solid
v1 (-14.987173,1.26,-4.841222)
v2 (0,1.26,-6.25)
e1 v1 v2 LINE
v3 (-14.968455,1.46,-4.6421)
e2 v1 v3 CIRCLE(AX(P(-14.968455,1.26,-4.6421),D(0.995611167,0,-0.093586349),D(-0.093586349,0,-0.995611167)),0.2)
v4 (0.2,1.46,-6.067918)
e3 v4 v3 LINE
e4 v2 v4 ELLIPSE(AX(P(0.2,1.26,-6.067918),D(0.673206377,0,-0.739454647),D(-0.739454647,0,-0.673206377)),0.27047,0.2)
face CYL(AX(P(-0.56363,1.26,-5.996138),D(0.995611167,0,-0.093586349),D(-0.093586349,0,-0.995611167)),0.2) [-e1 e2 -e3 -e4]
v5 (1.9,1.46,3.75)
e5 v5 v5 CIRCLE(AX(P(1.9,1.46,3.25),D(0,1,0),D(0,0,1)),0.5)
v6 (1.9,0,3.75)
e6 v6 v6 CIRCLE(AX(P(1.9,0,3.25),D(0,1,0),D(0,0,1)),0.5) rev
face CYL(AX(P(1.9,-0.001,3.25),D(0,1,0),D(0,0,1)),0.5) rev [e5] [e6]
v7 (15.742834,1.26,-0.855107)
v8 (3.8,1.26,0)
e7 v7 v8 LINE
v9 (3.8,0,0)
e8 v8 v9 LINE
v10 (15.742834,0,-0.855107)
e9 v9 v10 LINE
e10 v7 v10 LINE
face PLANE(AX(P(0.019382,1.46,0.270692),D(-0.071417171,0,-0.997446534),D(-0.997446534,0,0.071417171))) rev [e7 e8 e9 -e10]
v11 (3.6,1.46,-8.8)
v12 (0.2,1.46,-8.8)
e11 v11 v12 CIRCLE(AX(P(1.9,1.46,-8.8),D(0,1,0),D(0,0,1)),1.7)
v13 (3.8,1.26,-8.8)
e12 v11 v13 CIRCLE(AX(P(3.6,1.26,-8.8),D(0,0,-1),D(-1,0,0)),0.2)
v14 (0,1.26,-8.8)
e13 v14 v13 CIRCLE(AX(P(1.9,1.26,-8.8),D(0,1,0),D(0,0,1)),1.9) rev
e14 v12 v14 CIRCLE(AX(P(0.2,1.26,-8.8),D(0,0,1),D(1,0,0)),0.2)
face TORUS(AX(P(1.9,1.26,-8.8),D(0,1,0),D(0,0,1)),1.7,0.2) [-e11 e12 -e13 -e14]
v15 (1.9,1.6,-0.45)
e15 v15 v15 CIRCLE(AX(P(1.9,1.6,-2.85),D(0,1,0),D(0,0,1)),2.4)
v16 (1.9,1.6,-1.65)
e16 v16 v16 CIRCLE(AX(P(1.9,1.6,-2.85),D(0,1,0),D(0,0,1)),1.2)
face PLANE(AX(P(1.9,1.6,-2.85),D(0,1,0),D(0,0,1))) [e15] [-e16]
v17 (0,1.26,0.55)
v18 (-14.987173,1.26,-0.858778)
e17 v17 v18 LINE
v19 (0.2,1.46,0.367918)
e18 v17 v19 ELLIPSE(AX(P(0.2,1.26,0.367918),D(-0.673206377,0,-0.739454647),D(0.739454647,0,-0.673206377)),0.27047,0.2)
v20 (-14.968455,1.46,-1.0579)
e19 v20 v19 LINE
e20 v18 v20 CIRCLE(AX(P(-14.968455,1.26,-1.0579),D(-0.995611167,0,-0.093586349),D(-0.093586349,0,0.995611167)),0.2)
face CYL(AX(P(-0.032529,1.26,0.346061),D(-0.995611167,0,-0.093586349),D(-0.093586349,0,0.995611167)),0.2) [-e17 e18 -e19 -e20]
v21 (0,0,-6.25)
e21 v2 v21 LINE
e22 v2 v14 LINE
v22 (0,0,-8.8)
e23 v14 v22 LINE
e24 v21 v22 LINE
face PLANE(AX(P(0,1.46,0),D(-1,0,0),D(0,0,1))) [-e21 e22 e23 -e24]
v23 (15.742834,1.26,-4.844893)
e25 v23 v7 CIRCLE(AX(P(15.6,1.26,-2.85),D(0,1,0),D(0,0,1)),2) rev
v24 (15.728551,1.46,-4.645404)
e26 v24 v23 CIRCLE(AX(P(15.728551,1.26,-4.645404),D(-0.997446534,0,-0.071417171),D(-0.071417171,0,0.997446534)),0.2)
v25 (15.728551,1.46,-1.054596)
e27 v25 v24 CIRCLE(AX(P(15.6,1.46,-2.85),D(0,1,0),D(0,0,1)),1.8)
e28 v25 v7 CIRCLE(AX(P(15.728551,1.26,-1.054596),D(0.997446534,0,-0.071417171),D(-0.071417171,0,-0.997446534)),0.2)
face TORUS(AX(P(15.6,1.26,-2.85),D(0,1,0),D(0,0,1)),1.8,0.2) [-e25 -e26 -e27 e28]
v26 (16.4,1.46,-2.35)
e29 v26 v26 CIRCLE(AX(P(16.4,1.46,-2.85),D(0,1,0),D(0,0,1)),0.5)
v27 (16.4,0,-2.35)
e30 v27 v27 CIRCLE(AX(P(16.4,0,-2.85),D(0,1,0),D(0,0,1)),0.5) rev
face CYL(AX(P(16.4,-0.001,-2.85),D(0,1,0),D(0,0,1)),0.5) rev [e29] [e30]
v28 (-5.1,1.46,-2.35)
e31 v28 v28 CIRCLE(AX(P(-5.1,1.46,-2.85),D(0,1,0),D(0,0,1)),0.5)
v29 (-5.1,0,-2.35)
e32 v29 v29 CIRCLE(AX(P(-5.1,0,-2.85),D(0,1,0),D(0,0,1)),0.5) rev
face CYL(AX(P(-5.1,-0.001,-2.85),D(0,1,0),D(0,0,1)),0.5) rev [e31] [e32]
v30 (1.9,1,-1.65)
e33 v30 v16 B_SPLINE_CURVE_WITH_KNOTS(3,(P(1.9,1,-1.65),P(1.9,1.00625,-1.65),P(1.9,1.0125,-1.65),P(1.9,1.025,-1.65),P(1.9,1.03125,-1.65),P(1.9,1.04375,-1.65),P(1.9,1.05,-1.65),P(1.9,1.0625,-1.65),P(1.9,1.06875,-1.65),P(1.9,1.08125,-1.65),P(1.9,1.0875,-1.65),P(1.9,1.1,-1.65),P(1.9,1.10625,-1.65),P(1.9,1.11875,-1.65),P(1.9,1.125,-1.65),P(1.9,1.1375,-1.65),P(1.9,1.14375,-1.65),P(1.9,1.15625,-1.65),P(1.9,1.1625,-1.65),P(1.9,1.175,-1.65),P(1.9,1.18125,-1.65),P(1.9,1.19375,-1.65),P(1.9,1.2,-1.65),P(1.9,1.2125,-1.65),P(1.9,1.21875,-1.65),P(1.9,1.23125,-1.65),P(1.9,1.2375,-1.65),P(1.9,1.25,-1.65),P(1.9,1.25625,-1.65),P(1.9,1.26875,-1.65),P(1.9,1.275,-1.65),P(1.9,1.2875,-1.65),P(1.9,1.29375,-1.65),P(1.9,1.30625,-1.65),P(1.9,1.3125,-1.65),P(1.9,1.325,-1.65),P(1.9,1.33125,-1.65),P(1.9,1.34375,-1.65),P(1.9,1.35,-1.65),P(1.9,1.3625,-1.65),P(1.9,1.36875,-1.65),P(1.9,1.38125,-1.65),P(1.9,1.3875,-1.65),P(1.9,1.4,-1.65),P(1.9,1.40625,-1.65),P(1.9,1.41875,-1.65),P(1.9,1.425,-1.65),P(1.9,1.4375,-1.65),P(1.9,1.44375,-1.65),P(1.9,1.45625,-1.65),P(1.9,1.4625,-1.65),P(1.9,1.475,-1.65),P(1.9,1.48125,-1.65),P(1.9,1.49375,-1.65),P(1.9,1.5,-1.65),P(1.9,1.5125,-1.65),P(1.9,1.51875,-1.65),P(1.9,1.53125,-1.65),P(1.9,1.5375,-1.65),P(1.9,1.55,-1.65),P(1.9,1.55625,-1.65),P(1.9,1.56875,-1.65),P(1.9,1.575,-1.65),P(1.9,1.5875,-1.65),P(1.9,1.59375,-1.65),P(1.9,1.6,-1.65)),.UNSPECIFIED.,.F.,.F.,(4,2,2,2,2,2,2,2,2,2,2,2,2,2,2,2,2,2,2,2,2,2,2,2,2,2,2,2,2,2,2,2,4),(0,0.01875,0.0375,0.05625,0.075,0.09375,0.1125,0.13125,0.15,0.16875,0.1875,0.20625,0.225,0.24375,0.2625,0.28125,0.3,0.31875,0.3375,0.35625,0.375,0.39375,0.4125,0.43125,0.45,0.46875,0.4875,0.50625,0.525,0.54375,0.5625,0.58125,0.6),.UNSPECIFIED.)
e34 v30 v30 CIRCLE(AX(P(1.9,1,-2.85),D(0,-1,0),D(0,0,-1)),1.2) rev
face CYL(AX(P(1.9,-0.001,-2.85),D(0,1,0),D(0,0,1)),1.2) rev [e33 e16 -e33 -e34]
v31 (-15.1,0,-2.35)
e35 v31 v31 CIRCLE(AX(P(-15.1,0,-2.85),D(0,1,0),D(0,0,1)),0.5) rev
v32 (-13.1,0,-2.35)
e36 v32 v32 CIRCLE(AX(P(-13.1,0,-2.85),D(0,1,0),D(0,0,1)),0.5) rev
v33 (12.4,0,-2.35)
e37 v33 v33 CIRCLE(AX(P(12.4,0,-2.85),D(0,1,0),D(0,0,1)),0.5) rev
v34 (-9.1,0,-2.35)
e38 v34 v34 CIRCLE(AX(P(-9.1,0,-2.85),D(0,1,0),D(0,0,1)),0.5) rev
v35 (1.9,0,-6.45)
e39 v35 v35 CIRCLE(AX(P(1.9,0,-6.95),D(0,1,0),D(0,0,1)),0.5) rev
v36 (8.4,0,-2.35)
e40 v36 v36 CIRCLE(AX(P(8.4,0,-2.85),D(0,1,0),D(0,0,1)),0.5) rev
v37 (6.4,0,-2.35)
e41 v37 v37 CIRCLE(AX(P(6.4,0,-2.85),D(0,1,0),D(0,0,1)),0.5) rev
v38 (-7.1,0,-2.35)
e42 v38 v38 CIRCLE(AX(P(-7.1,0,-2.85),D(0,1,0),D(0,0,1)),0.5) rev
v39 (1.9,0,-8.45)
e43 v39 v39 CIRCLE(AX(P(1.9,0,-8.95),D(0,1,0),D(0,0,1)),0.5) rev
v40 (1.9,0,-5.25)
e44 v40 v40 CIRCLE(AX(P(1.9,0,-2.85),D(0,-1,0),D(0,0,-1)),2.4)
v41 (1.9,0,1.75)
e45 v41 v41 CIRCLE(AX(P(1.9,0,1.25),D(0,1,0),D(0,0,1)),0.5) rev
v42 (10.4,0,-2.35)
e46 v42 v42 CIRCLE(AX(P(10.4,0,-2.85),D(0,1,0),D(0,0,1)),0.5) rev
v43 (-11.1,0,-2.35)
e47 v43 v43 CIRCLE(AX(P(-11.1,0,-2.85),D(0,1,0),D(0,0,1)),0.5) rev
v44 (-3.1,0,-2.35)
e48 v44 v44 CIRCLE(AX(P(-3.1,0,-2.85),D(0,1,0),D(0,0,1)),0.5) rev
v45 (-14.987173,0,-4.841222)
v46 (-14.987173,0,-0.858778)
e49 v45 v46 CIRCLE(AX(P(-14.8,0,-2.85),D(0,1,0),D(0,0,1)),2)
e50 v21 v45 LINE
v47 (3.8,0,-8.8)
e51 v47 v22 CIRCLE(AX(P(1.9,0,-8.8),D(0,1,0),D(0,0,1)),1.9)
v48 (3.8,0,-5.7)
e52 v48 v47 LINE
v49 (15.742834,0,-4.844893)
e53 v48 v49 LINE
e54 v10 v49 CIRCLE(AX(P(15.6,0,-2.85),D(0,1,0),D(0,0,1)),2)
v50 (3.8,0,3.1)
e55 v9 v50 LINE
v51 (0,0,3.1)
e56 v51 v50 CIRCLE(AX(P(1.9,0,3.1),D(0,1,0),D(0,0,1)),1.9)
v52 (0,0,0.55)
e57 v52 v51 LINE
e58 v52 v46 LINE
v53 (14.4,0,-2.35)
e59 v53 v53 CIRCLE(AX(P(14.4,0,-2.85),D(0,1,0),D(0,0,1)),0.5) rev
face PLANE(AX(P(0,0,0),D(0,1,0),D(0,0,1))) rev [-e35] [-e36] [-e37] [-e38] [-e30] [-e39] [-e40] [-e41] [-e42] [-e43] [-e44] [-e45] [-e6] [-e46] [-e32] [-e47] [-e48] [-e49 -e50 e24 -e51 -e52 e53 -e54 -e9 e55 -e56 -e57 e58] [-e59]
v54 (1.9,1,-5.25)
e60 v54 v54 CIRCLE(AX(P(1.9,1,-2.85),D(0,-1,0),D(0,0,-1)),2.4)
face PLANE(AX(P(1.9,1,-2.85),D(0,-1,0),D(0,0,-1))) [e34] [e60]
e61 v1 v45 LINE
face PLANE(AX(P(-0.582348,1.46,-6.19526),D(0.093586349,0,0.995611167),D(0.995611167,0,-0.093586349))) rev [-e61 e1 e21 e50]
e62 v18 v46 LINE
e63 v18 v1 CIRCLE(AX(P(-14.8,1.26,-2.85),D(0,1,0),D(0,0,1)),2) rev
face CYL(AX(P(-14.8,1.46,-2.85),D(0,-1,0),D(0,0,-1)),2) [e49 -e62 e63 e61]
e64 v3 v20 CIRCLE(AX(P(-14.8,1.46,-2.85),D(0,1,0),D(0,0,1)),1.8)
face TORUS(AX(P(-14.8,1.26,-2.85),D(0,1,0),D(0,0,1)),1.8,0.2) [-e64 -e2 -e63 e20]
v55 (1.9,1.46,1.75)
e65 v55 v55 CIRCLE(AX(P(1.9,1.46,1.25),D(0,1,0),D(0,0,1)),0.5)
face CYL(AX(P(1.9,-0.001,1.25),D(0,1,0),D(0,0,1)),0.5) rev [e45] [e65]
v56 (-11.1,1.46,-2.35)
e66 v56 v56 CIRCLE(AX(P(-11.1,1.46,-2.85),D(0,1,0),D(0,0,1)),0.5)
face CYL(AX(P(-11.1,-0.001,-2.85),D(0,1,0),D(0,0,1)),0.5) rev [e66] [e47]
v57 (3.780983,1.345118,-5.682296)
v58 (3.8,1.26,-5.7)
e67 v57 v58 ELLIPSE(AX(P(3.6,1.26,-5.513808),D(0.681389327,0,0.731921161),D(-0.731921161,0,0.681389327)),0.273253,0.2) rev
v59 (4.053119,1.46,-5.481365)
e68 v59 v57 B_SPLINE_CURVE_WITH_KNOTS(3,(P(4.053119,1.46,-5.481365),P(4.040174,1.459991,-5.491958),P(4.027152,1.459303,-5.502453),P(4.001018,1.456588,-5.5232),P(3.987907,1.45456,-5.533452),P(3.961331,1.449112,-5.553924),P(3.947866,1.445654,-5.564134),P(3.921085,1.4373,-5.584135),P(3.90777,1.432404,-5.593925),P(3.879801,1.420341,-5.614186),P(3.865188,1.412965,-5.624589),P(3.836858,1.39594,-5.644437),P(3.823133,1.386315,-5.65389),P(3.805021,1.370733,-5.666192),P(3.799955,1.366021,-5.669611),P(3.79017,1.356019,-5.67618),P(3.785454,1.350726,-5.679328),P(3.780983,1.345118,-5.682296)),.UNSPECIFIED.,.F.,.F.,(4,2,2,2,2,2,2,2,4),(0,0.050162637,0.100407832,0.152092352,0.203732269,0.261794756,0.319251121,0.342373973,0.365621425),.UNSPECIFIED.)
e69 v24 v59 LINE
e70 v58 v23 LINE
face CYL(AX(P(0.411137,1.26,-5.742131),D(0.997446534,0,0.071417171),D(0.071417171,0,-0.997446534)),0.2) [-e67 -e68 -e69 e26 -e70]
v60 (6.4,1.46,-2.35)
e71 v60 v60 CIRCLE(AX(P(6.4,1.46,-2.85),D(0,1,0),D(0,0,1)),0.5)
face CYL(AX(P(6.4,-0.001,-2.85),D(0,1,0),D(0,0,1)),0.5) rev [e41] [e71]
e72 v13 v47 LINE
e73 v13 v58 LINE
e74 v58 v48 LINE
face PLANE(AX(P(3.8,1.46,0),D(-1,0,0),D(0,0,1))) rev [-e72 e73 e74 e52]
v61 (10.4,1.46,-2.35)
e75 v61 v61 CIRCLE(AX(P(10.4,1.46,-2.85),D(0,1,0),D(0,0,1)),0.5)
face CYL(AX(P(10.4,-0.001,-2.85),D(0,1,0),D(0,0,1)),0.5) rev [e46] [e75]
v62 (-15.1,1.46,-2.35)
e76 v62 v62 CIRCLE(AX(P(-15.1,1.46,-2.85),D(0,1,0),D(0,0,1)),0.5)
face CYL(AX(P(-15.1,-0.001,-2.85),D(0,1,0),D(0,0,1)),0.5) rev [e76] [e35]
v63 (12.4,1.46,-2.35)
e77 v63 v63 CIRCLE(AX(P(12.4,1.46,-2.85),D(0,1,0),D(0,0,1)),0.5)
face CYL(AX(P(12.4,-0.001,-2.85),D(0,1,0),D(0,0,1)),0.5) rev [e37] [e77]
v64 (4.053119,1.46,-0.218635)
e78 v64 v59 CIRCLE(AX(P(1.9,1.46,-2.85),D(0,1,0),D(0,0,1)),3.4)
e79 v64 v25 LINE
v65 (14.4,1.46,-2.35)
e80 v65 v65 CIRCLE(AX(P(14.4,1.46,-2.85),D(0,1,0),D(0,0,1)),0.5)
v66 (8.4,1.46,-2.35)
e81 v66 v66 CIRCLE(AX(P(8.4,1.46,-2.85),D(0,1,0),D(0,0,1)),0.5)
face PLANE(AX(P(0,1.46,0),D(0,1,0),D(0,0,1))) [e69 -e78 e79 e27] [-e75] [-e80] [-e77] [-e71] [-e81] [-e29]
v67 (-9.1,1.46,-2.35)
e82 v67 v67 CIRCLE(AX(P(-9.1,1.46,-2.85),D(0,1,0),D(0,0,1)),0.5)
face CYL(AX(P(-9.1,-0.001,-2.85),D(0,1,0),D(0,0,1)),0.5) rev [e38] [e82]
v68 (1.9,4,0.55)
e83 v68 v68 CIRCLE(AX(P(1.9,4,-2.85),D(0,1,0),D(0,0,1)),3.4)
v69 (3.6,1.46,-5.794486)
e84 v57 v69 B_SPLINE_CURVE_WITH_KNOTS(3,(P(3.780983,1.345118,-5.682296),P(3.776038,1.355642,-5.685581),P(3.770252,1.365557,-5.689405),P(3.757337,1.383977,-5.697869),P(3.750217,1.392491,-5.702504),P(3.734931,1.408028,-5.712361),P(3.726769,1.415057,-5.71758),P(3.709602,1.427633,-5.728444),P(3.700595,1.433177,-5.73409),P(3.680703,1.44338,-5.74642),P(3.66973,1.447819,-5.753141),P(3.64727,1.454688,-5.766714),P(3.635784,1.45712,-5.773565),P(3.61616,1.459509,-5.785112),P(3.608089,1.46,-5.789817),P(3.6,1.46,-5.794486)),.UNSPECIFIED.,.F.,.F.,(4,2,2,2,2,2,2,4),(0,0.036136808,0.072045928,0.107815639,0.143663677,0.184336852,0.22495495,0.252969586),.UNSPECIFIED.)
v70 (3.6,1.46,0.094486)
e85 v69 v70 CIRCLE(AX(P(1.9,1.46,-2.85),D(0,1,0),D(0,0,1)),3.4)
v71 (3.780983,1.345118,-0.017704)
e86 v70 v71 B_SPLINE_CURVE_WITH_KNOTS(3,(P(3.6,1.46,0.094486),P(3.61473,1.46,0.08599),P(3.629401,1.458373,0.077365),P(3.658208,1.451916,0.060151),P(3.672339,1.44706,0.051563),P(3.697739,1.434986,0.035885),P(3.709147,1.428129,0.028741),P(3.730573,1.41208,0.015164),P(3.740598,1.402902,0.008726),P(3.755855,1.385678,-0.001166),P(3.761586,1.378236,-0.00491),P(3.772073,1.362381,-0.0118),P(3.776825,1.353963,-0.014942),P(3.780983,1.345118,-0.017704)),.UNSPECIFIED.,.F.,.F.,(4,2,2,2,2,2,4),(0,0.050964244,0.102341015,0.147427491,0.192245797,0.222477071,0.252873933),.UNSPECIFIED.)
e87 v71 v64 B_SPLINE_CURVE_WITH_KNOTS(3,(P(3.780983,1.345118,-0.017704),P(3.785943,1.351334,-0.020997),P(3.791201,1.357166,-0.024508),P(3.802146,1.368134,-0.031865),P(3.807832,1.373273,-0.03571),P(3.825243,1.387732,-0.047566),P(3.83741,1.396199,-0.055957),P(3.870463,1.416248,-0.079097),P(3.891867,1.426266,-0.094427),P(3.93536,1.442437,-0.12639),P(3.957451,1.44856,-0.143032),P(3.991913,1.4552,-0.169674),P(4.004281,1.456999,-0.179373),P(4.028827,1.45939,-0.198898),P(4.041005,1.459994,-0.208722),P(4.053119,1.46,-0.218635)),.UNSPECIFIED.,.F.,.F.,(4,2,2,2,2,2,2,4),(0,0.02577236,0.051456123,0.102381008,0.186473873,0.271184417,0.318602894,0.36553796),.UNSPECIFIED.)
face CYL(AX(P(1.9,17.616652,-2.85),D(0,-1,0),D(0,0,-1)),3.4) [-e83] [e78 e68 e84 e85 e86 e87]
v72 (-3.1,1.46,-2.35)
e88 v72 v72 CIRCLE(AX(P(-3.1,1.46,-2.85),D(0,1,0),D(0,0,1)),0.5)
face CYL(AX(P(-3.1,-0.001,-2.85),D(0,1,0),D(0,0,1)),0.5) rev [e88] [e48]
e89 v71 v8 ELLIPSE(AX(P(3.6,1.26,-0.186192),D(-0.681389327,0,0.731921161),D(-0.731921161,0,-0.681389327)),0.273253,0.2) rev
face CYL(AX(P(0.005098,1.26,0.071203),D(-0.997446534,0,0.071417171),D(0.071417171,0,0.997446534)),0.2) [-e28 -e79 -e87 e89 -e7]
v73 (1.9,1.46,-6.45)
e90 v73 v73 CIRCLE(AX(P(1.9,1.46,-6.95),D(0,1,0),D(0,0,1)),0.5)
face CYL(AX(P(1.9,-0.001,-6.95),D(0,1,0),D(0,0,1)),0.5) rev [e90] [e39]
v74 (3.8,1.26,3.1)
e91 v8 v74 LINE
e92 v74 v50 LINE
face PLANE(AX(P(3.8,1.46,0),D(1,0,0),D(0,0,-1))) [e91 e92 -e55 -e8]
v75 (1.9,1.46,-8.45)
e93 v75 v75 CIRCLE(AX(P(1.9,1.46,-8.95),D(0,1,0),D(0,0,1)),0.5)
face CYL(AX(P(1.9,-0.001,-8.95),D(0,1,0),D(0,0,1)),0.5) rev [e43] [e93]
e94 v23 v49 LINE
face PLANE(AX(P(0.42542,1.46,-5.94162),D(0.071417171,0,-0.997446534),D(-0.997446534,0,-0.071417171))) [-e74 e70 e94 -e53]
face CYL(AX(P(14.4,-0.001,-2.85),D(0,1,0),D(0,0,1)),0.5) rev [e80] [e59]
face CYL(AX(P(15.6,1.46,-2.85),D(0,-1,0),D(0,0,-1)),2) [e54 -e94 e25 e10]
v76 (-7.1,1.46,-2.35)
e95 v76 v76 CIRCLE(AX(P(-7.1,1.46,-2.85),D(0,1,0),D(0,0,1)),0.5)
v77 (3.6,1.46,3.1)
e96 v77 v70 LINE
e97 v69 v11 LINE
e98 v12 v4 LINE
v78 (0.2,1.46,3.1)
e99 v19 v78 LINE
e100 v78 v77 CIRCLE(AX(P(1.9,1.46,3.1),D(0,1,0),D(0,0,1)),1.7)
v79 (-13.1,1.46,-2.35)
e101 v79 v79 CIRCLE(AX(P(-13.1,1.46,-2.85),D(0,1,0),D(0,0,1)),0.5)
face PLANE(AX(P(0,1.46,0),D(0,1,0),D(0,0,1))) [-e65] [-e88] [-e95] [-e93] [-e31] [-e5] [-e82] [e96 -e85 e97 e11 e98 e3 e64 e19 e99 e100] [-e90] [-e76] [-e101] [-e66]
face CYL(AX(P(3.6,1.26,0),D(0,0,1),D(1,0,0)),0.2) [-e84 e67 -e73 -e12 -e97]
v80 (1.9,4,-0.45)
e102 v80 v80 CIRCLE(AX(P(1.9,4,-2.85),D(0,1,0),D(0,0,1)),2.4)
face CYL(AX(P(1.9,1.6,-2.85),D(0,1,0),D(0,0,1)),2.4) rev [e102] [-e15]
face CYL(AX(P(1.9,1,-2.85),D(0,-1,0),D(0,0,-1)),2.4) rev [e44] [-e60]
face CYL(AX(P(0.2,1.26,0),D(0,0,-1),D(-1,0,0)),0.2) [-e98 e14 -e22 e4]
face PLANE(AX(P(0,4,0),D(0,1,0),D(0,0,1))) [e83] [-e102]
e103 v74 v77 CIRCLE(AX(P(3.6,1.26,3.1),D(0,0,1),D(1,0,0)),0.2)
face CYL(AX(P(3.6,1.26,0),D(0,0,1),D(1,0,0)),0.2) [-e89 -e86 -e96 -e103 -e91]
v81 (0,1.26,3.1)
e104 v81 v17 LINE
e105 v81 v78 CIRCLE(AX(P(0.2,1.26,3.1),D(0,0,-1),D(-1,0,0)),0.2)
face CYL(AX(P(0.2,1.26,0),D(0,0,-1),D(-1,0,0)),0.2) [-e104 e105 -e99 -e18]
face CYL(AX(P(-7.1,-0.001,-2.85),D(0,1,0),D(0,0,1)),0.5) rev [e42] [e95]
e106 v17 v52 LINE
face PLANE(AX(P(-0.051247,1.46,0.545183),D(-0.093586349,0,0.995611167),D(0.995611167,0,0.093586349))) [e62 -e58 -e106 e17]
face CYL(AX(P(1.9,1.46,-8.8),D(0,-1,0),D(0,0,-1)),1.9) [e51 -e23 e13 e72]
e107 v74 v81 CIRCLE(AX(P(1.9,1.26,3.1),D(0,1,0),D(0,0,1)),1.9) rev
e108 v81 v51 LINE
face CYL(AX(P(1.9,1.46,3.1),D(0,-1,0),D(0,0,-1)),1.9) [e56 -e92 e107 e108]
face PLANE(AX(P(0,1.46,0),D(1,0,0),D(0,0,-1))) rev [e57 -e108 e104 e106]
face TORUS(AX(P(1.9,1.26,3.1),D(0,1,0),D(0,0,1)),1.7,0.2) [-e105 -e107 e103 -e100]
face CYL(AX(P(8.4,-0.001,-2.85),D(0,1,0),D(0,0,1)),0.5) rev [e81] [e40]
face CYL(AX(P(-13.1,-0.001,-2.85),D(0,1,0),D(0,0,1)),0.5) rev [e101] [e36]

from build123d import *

# Parameters (mm, degrees)
BOSS_EXTRUDE2_START       = -1.46
BOSS_EXTRUDE2_DEPTH       = 1.46
BOSS_EXTRUDE2_2_OUTLINE_R = 3.4
BOSS_EXTRUDE2_2_DEPTH     = 2.54
FILLET1_R                 = 0.2
SKETCH3_R                 = 2.4
CUT_EXTRUDE1_DEPTH        = 2.4
CUT_EXTRUDE2_START        = -1
SKETCH4_R                 = 2.4
CUT_EXTRUDE2_DEPTH        = 1
CUT_EXTRUDE3_REACH        = 22.737
SKETCH5_R                 = 1.2
CUT_EXTRUDE4_REACH        = 22.753
SKETCH6_R                 = 0.5


# Read off the part's stored shape, not the designer's step: Boss-Extrude2
with BuildPart() as part:
    # Boss-Extrude2 outline → Boss-Extrude2 (new body)
    with BuildSketch(Plane(origin=(0, 1.46, 0), x_dir=(1, 0, 0), z_dir=(0, 1, 0)).offset(BOSS_EXTRUDE2_START)):
        with BuildLine():
            ThreePointArc((0, -3.1), (1.9, -5), (3.8, -3.1))
            Line((3.8, -3.1), (3.8, 0))
            Line((3.8, 0), (15.742834343, 0.855106933))
            ThreePointArc((15.742834343, 0.855106933), (17.6, 2.85), (15.742834343, 4.844893067))
            Line((15.742834343, 4.844893067), (3.8, 5.7))
            Line((3.8, 5.7), (3.8, 8.8))
            ThreePointArc((3.8, 8.8), (1.9, 10.7), (0, 8.8))
            Line((0, 8.8), (0, 6.25))
            Line((0, 6.25), (-14.987172698, 4.841222333))
            ThreePointArc((-14.987172698, 4.841222333), (-16.8, 2.85), (-14.987172698, 0.858777667))
            Line((-14.987172698, 0.858777667), (0, -0.55))
            Line((0, -0.55), (0, -3.1))
        make_face()
    extrude(amount=BOSS_EXTRUDE2_DEPTH)

    # Boss-Extrude2 2 outline → Boss-Extrude2 2 (add)
    with BuildSketch(Plane(origin=(0, 1.46, 0), x_dir=(1, 0, 0), z_dir=(0, 1, 0))):
        with Locations((1.9, 2.85)):
            Circle(BOSS_EXTRUDE2_2_OUTLINE_R)
    extrude(amount=BOSS_EXTRUDE2_2_DEPTH)

    # Fillet1
    # the kernel refuses this fillet: 0.2 mm, written as the material it takes off along each edge
    with BuildSketch(Plane(origin=(15.6, 1.46, -2.85), x_dir=(0.0714171712881136, 0, 0.9974465337276001), z_dir=(-0.9974465337276001, 0, 0.0714171712881136))) as fillet1_piece_1:
        with BuildLine():
            CenterArc((2 - FILLET1_R, -FILLET1_R), FILLET1_R, 0, 90)
            Line((2, -FILLET1_R), (2, 0))
            Line((2, 0), (2 - FILLET1_R, 0))
        make_face()
    revolve(axis=Axis((15.6, 1.46, -2.85), (0, 1, 0)), revolution_arc=171.809222188, mode=Mode.SUBTRACT)
    with BuildSketch(Plane(origin=(15.742834343, 1.46, -4.844893067), x_dir=(-0.07141717131707818, 0, 0.9974465337255262), z_dir=(-0.9974465337255262, 0, -0.07141717131707818))) as fillet1_piece_2_section:
        with BuildLine():
            CenterArc((FILLET1_R, -FILLET1_R), FILLET1_R, 90, 90)
            Line((0, -FILLET1_R), (0, 0))
            Line((0, 0), (FILLET1_R, 0))
        make_face()
    fillet1_piece_2 = extrude(amount=12.473408037, mode=Mode.PRIVATE)
    fillet1_piece_2 = fillet1_piece_2 - Plane(origin=(1.9, 1.414610024, -2.85), x_dir=(1, 0, 0), z_dir=(0, -1, 0)) * Cylinder(3.4, 26, mode=Mode.PRIVATE)
    fillet1_piece_2 = split(fillet1_piece_2, bisect_by=Plane(origin=(3.8, 1.414610024, -5.226018326), z_dir=(1, 0, 0)), keep=Keep.TOP, mode=Mode.PRIVATE)
    add(fillet1_piece_2, mode=Mode.SUBTRACT)
    with BuildSketch(Plane(origin=(3.8, 1.46, -5.2), x_dir=(-1, 0, 0), z_dir=(0, 0, -1))) as fillet1_piece_3_section:
        with BuildLine():
            CenterArc((FILLET1_R, -FILLET1_R), FILLET1_R, 90, 90)
            Line((0, -FILLET1_R), (0, 0))
            Line((0, 0), (FILLET1_R, 0))
        make_face()
    fillet1_piece_3 = extrude(amount=3.6, mode=Mode.PRIVATE)
    fillet1_piece_3 = fillet1_piece_3 - Plane(origin=(1.9, 1.414595977, -2.85), x_dir=(1, 0, 0), z_dir=(0, -1, 0)) * Cylinder(3.4, 9, mode=Mode.PRIVATE)
    fillet1_piece_3 = split(fillet1_piece_3, bisect_by=Plane(origin=(3.644376432, 1.414595977, -5.711142647), z_dir=(0.07141717131707818, 0, -0.9974465337255262)), keep=Keep.TOP, mode=Mode.PRIVATE)
    add(fillet1_piece_3, mode=Mode.SUBTRACT)
    with BuildSketch(Plane(origin=(1.9, 1.46, -8.8), x_dir=(1, 0, 0), z_dir=(0, 0, 1))) as fillet1_piece_4:
        with BuildLine():
            CenterArc((1.9 - FILLET1_R, -FILLET1_R), FILLET1_R, 0, 90)
            Line((1.9 - FILLET1_R, 0), (1.9, 0))
            Line((1.9, 0), (1.9, -FILLET1_R))
        make_face()
    revolve(axis=Axis((1.9, 1.46, -8.8), (0, 1, 0)), revolution_arc=180, mode=Mode.SUBTRACT)
    with BuildSketch(Plane(origin=(0, 1.46, -8.8), x_dir=(0, -1, 0), z_dir=(0, 0, 1))) as fillet1_piece_5_section:
        with BuildLine():
            CenterArc((FILLET1_R, FILLET1_R), FILLET1_R, 180, 90)
            Line((0, FILLET1_R), (0, 0))
            Line((0, 0), (FILLET1_R, 0))
        make_face()
    fillet1_piece_5 = extrude(amount=3.05, mode=Mode.PRIVATE)
    fillet1_piece_5 = split(fillet1_piece_5, bisect_by=Plane(origin=(0.163811302, 1.414680425, -6.265398081), z_dir=(-0.09358634913497901, 0, -0.9956111666989207)), keep=Keep.TOP, mode=Mode.PRIVATE)
    add(fillet1_piece_5, mode=Mode.SUBTRACT)
    with BuildSketch(Plane(origin=(0.497805583, 1.46, -6.296793175), x_dir=(0, -1, 0), z_dir=(-0.9956111666989207, 0, 0.09358634913497901))) as fillet1_piece_6_section:
        with BuildLine():
            CenterArc((FILLET1_R, FILLET1_R), FILLET1_R, 180, 90)
            Line((0, FILLET1_R), (0, 0))
            Line((0, 0), (FILLET1_R, 0))
        make_face()
    fillet1_piece_6 = extrude(amount=15.553238854, mode=Mode.PRIVATE)
    fillet1_piece_6 = split(fillet1_piece_6, bisect_by=Plane(origin=(0, 1.414714117, -5.500343318), z_dir=(-1, 0, 0)), keep=Keep.TOP, mode=Mode.PRIVATE)
    add(fillet1_piece_6, mode=Mode.SUBTRACT)
    with BuildSketch(Plane(origin=(-14.8, 1.46, -2.85), x_dir=(-0.09358634878932036, 0, -0.9956111667314121), z_dir=(0.9956111667314121, 0, -0.09358634878932036))) as fillet1_piece_7:
        with BuildLine():
            CenterArc((2 - FILLET1_R, -FILLET1_R), FILLET1_R, 0, 90)
            Line((2, -FILLET1_R), (2, 0))
            Line((2, 0), (2 - FILLET1_R, 0))
        make_face()
    revolve(axis=Axis((-14.8, 1.46, -2.85), (0, 1, 0)), revolution_arc=169.260077878, mode=Mode.SUBTRACT)
    with BuildSketch(Plane(origin=(3.8, 1.46, 3.1), x_dir=(-1, 0, 0), z_dir=(0, 0, -1))) as fillet1_piece_8_section:
        with BuildLine():
            CenterArc((FILLET1_R, -FILLET1_R), FILLET1_R, 90, 90)
            Line((0, -FILLET1_R), (0, 0))
            Line((0, 0), (FILLET1_R, 0))
        make_face()
    fillet1_piece_8 = extrude(amount=3.6, mode=Mode.PRIVATE)
    fillet1_piece_8 = fillet1_piece_8 - Plane(origin=(1.9, 1.414595975, -2.85), x_dir=(1, 0, 0), z_dir=(0, -1, 0)) * Cylinder(3.4, 9, mode=Mode.PRIVATE)
    fillet1_piece_8 = split(fillet1_piece_8, bisect_by=Plane(origin=(3.644376436, 1.414595975, 0.011142647), z_dir=(0.07141717131707817, 0, 0.9974465337255262)), keep=Keep.TOP, mode=Mode.PRIVATE)
    add(fillet1_piece_8, mode=Mode.SUBTRACT)
    with BuildSketch(Plane(origin=(-14.987172698, 1.46, -0.858777667), x_dir=(0.09358634913497903, 0, -0.9956111666989206), z_dir=(0.9956111666989207, 0, 0.09358634913497903))) as fillet1_piece_9_section:
        with BuildLine():
            CenterArc((FILLET1_R, -FILLET1_R), FILLET1_R, 90, 90)
            Line((0, -FILLET1_R), (0, 0))
            Line((0, 0), (FILLET1_R, 0))
        make_face()
    fillet1_piece_9 = extrude(amount=15.553238854, mode=Mode.PRIVATE)
    fillet1_piece_9 = split(fillet1_piece_9, bisect_by=Plane(origin=(0, 1.414714117, -0.199656682), z_dir=(-1, 0, 0)), keep=Keep.TOP, mode=Mode.PRIVATE)
    add(fillet1_piece_9, mode=Mode.SUBTRACT)
    with BuildSketch(Plane(origin=(0, 1.46, 0.05), x_dir=(1, 0, 0), z_dir=(0, 0, 1))) as fillet1_piece_10_section:
        with BuildLine():
            CenterArc((FILLET1_R, -FILLET1_R), FILLET1_R, 90, 90)
            Line((0, -FILLET1_R), (0, 0))
            Line((0, 0), (FILLET1_R, 0))
        make_face()
    fillet1_piece_10 = extrude(amount=3.05, mode=Mode.PRIVATE)
    fillet1_piece_10 = split(fillet1_piece_10, bisect_by=Plane(origin=(0.163811302, 1.414680425, 0.565398081), z_dir=(-0.09358634913497903, 0, 0.9956111666989207)), keep=Keep.TOP, mode=Mode.PRIVATE)
    add(fillet1_piece_10, mode=Mode.SUBTRACT)
    with BuildSketch(Plane(origin=(1.9, 1.46, 3.1), x_dir=(-1, 0, 0), z_dir=(0, 0, -1))) as fillet1_piece_11:
        with BuildLine():
            CenterArc((1.9 - FILLET1_R, -FILLET1_R), FILLET1_R, 0, 90)
            Line((1.9, -FILLET1_R), (1.9, 0))
            Line((1.9, 0), (1.9 - FILLET1_R, 0))
        make_face()
    revolve(axis=Axis((1.9, 1.46, 3.1), (0, 1, 0)), revolution_arc=180, mode=Mode.SUBTRACT)
    with BuildSketch(Plane(origin=(3.301276733, 1.46, 0.035708586), x_dir=(-0.07141717131707817, 0, -0.997446533725526), z_dir=(0.9974465337255262, 0, -0.07141717131707817))) as fillet1_piece_12_section:
        with BuildLine():
            CenterArc((FILLET1_R, -FILLET1_R), FILLET1_R, 90, 90)
            Line((0, -FILLET1_R), (0, 0))
            Line((0, 0), (FILLET1_R, 0))
        make_face()
    fillet1_piece_12 = extrude(amount=12.473408037, mode=Mode.PRIVATE)
    fillet1_piece_12 = fillet1_piece_12 - Plane(origin=(1.9, 1.414610017, -2.85), x_dir=(1, 0, 0), z_dir=(0, -1, 0)) * Cylinder(3.4, 26, mode=Mode.PRIVATE)
    fillet1_piece_12 = split(fillet1_piece_12, bisect_by=Plane(origin=(3.8, 1.414610017, -0.473981762), z_dir=(1, 0, 0)), keep=Keep.TOP, mode=Mode.PRIVATE)
    add(fillet1_piece_12, mode=Mode.SUBTRACT)
    with BuildSketch(Plane(origin=(3.8, 1.46, -5.2), x_dir=(-1, 0, 0), z_dir=(0, 0, -1))) as fillet1_piece_13a_section:
        with BuildLine():
            CenterArc((FILLET1_R, -FILLET1_R), FILLET1_R, 90, 90)
            Line((0, -FILLET1_R), (0, 0))
            Line((0, 0), (FILLET1_R, 0))
        make_face()
    fillet1_piece_13a = extrude(amount=3.6, mode=Mode.PRIVATE)
    fillet1_piece_13a = fillet1_piece_13a - Plane(origin=(1.9, 1.388873643, -2.85), x_dir=(1, 0, 0), z_dir=(0, -1, 0)) * Cylinder(3.4, 9, mode=Mode.PRIVATE)
    fillet1_piece_13a = split(fillet1_piece_13a, bisect_by=Plane(origin=(3.789755805, 1.388873643, -5.700733484), z_dir=(-0.07141717131707818, 0, 0.9974465337255262)), keep=Keep.TOP, mode=Mode.PRIVATE)
    with BuildSketch(Plane(origin=(15.742834343, 1.46, -4.844893067), x_dir=(-0.07141717131707818, 0, 0.9974465337255262), z_dir=(-0.9974465337255262, 0, -0.07141717131707818))) as fillet1_piece_13b_section:
        with BuildLine():
            CenterArc((FILLET1_R, -FILLET1_R), FILLET1_R, 90, 90)
            Line((0, -FILLET1_R), (0, 0))
            Line((0, 0), (FILLET1_R, 0))
        make_face()
    fillet1_piece_13b = extrude(amount=12.473408037, mode=Mode.PRIVATE)
    fillet1_piece_13b = fillet1_piece_13b - Plane(origin=(1.9, 1.381316193, -2.85), x_dir=(1, 0, 0), z_dir=(0, -1, 0)) * Cylinder(3.4, 26, mode=Mode.PRIVATE)
    fillet1_piece_13b = split(fillet1_piece_13b, bisect_by=Plane(origin=(3.8, 1.381316193, -5.695627547), z_dir=(-1, 0, 0)), keep=Keep.TOP, mode=Mode.PRIVATE)
    fillet1_piece_13 = fillet1_piece_13a & fillet1_piece_13b
    add(fillet1_piece_13, mode=Mode.SUBTRACT)
    with BuildSketch(Plane(origin=(0, 1.46, -8.8), x_dir=(0, -1, 0), z_dir=(0, 0, 1))) as fillet1_piece_14a_section:
        with BuildLine():
            CenterArc((FILLET1_R, FILLET1_R), FILLET1_R, 180, 90)
            Line((0, FILLET1_R), (0, 0))
            Line((0, 0), (FILLET1_R, 0))
        make_face()
    fillet1_piece_14a = extrude(amount=3.05, mode=Mode.PRIVATE)
    fillet1_piece_14a = split(fillet1_piece_14a, bisect_by=Plane(origin=(0.02192606, 1.414831105, -6.252061025), z_dir=(0.09358634913497901, 0, 0.9956111666989207)), keep=Keep.TOP, mode=Mode.PRIVATE)
    fillet1_piece_14a = fillet1_piece_14a - Plane(origin=(1.9, 1.414831105, -2.85), x_dir=(1, 0, 0), z_dir=(0, -1, 0)) * Cylinder(3.4, 7, mode=Mode.PRIVATE)
    with BuildSketch(Plane(origin=(0.497805583, 1.46, -6.296793175), x_dir=(0, -1, 0), z_dir=(-0.9956111666989207, 0, 0.09358634913497901))) as fillet1_piece_14b_section:
        with BuildLine():
            CenterArc((FILLET1_R, FILLET1_R), FILLET1_R, 180, 90)
            Line((0, FILLET1_R), (0, 0))
            Line((0, 0), (FILLET1_R, 0))
        make_face()
    fillet1_piece_14b = extrude(amount=15.553238854, mode=Mode.PRIVATE)
    fillet1_piece_14b = split(fillet1_piece_14b, bisect_by=Plane(origin=(0, 1.414925706, -6.227770573), z_dir=(1, 0, 0)), keep=Keep.TOP, mode=Mode.PRIVATE)
    fillet1_piece_14 = fillet1_piece_14a & fillet1_piece_14b
    add(fillet1_piece_14, mode=Mode.SUBTRACT)
    with BuildSketch(Plane(origin=(3.301276733, 1.46, 0.035708586), x_dir=(-0.07141717131707817, 0, -0.997446533725526), z_dir=(0.9974465337255262, 0, -0.07141717131707817))) as fillet1_piece_15a_section:
        with BuildLine():
            CenterArc((FILLET1_R, -FILLET1_R), FILLET1_R, 90, 90)
            Line((0, -FILLET1_R), (0, 0))
            Line((0, 0), (FILLET1_R, 0))
        make_face()
    fillet1_piece_15a = extrude(amount=12.473408037, mode=Mode.PRIVATE)
    fillet1_piece_15a = fillet1_piece_15a - Plane(origin=(1.9, 1.381316193, -2.85), x_dir=(1, 0, 0), z_dir=(0, -1, 0)) * Cylinder(3.4, 26, mode=Mode.PRIVATE)
    fillet1_piece_15a = split(fillet1_piece_15a, bisect_by=Plane(origin=(3.8, 1.381316193, -0.004372453), z_dir=(-1, 0, 0)), keep=Keep.TOP, mode=Mode.PRIVATE)
    with BuildSketch(Plane(origin=(3.8, 1.46, 3.1), x_dir=(-1, 0, 0), z_dir=(0, 0, -1))) as fillet1_piece_15b_section:
        with BuildLine():
            CenterArc((FILLET1_R, -FILLET1_R), FILLET1_R, 90, 90)
            Line((0, -FILLET1_R), (0, 0))
            Line((0, 0), (FILLET1_R, 0))
        make_face()
    fillet1_piece_15b = extrude(amount=3.6, mode=Mode.PRIVATE)
    fillet1_piece_15b = fillet1_piece_15b - Plane(origin=(1.9, 1.388873643, -2.85), x_dir=(1, 0, 0), z_dir=(0, -1, 0)) * Cylinder(3.4, 9, mode=Mode.PRIVATE)
    fillet1_piece_15b = split(fillet1_piece_15b, bisect_by=Plane(origin=(3.789755805, 1.388873643, 0.000733484), z_dir=(-0.07141717131707817, 0, -0.9974465337255262)), keep=Keep.TOP, mode=Mode.PRIVATE)
    fillet1_piece_15 = fillet1_piece_15a & fillet1_piece_15b
    add(fillet1_piece_15, mode=Mode.SUBTRACT)
    with BuildSketch(Plane(origin=(-14.987172698, 1.46, -0.858777667), x_dir=(0.09358634913497903, 0, -0.9956111666989206), z_dir=(0.9956111666989207, 0, 0.09358634913497903))) as fillet1_piece_16a_section:
        with BuildLine():
            CenterArc((FILLET1_R, -FILLET1_R), FILLET1_R, 90, 90)
            Line((0, -FILLET1_R), (0, 0))
            Line((0, 0), (FILLET1_R, 0))
        make_face()
    fillet1_piece_16a = extrude(amount=15.553238854, mode=Mode.PRIVATE)
    fillet1_piece_16a = split(fillet1_piece_16a, bisect_by=Plane(origin=(0, 1.414925706, 0.527770573), z_dir=(1, 0, 0)), keep=Keep.TOP, mode=Mode.PRIVATE)
    with BuildSketch(Plane(origin=(0, 1.46, 0.05), x_dir=(1, 0, 0), z_dir=(0, 0, 1))) as fillet1_piece_16b_section:
        with BuildLine():
            CenterArc((FILLET1_R, -FILLET1_R), FILLET1_R, 90, 90)
            Line((0, -FILLET1_R), (0, 0))
            Line((0, 0), (FILLET1_R, 0))
        make_face()
    fillet1_piece_16b = extrude(amount=3.05, mode=Mode.PRIVATE)
    fillet1_piece_16b = fillet1_piece_16b - Plane(origin=(1.9, 1.414831105, -2.85), x_dir=(1, 0, 0), z_dir=(0, -1, 0)) * Cylinder(3.4, 7, mode=Mode.PRIVATE)
    fillet1_piece_16b = split(fillet1_piece_16b, bisect_by=Plane(origin=(0.02192606, 1.414831105, 0.552061025), z_dir=(0.09358634913497903, 0, -0.9956111666989207)), keep=Keep.TOP, mode=Mode.PRIVATE)
    fillet1_piece_16 = fillet1_piece_16a & fillet1_piece_16b
    add(fillet1_piece_16, mode=Mode.SUBTRACT)

    # Sketch3 → Cut-Extrude1 (cut)
    with BuildSketch(Plane(origin=(0, 4, 0), x_dir=(1, 0, 0), z_dir=(0, 1, 0))):
        with Locations(Location((1.9, 2.85, 0), (0, 0, 270))):
            Circle(SKETCH3_R)
    extrude(amount=-CUT_EXTRUDE1_DEPTH, mode=Mode.SUBTRACT)

    # Sketch4 → Cut-Extrude2 (cut)
    with BuildSketch(Plane.XZ.offset(CUT_EXTRUDE2_START)):
        with Locations(Location((1.9, -2.85, 0), (0, 0, 90))):
            Circle(SKETCH4_R)
    extrude(amount=CUT_EXTRUDE2_DEPTH, mode=Mode.SUBTRACT)

    # Sketch5 → Cut-Extrude3 (cut, up to next)
    with BuildSketch(Plane(origin=(0, 1.6, 0), x_dir=(1, 0, 0), z_dir=(0, 1, 0)), mode=Mode.PRIVATE) as cut_extrude3_sk1:
        with Locations(Location((1.9, 2.85, 0), (0, 0, 270))):
            Circle(SKETCH5_R)
    cut_extrude3_tool1 = extrude(cut_extrude3_sk1.sketch, amount=-CUT_EXTRUDE3_REACH, mode=Mode.PRIVATE) & part.part
    add(cut_extrude3_tool1.solids().sort_by_distance((1.9, 1.6, -2.85))[0], mode=Mode.SUBTRACT)

    # Sketch6 → Cut-Extrude4 (cut, up to next)
    with BuildSketch(Plane(origin=(0, 1.46, 0), x_dir=(1, 0, 0), z_dir=(0, 1, 0)), mode=Mode.PRIVATE) as cut_extrude4_sk1:
        with Locations(Location((6.4, 2.85, 0), (0, 0, 270))):
            Circle(SKETCH6_R)
    cut_extrude4_tool1 = extrude(cut_extrude4_sk1.sketch, amount=-CUT_EXTRUDE4_REACH, mode=Mode.PRIVATE) & part.part
    # Sketch6 → Cut-Extrude4 (cut, up to next)
    with BuildSketch(Plane(origin=(0, 1.46, 0), x_dir=(1, 0, 0), z_dir=(0, 1, 0)), mode=Mode.PRIVATE) as cut_extrude4_sk2:
        with Locations(Location((8.4, 2.85, 0), (0, 0, 270))):
            Circle(SKETCH6_R)
    cut_extrude4_tool2 = extrude(cut_extrude4_sk2.sketch, amount=-CUT_EXTRUDE4_REACH, mode=Mode.PRIVATE) & part.part
    # Sketch6 → Cut-Extrude4 (cut, up to next)
    with BuildSketch(Plane(origin=(0, 1.46, 0), x_dir=(1, 0, 0), z_dir=(0, 1, 0)), mode=Mode.PRIVATE) as cut_extrude4_sk3:
        with Locations(Location((10.4, 2.85, 0), (0, 0, 270))):
            Circle(SKETCH6_R)
    cut_extrude4_tool3 = extrude(cut_extrude4_sk3.sketch, amount=-CUT_EXTRUDE4_REACH, mode=Mode.PRIVATE) & part.part
    # Sketch6 → Cut-Extrude4 (cut, up to next)
    with BuildSketch(Plane(origin=(0, 1.46, 0), x_dir=(1, 0, 0), z_dir=(0, 1, 0)), mode=Mode.PRIVATE) as cut_extrude4_sk4:
        with Locations(Location((12.4, 2.85, 0), (0, 0, 270))):
            Circle(SKETCH6_R)
    cut_extrude4_tool4 = extrude(cut_extrude4_sk4.sketch, amount=-CUT_EXTRUDE4_REACH, mode=Mode.PRIVATE) & part.part
    # Sketch6 → Cut-Extrude4 (cut, up to next)
    with BuildSketch(Plane(origin=(0, 1.46, 0), x_dir=(1, 0, 0), z_dir=(0, 1, 0)), mode=Mode.PRIVATE) as cut_extrude4_sk5:
        with Locations(Location((14.4, 2.85, 0), (0, 0, 270))):
            Circle(SKETCH6_R)
    cut_extrude4_tool5 = extrude(cut_extrude4_sk5.sketch, amount=-CUT_EXTRUDE4_REACH, mode=Mode.PRIVATE) & part.part
    # Sketch6 → Cut-Extrude4 (cut, up to next)
    with BuildSketch(Plane(origin=(0, 1.46, 0), x_dir=(1, 0, 0), z_dir=(0, 1, 0)), mode=Mode.PRIVATE) as cut_extrude4_sk6:
        with Locations(Location((16.4, 2.85, 0), (0, 0, 270))):
            Circle(SKETCH6_R)
    cut_extrude4_tool6 = extrude(cut_extrude4_sk6.sketch, amount=-CUT_EXTRUDE4_REACH, mode=Mode.PRIVATE) & part.part
    # Sketch6 → Cut-Extrude4 (cut, up to next)
    with BuildSketch(Plane(origin=(0, 1.46, 0), x_dir=(1, 0, 0), z_dir=(0, 1, 0)), mode=Mode.PRIVATE) as cut_extrude4_sk7:
        with Locations(Location((-3.1, 2.85, 0), (0, 0, 270))):
            Circle(SKETCH6_R)
    cut_extrude4_tool7 = extrude(cut_extrude4_sk7.sketch, amount=-CUT_EXTRUDE4_REACH, mode=Mode.PRIVATE) & part.part
    # Sketch6 → Cut-Extrude4 (cut, up to next)
    with BuildSketch(Plane(origin=(0, 1.46, 0), x_dir=(1, 0, 0), z_dir=(0, 1, 0)), mode=Mode.PRIVATE) as cut_extrude4_sk8:
        with Locations(Location((-5.1, 2.85, 0), (0, 0, 270))):
            Circle(SKETCH6_R)
    cut_extrude4_tool8 = extrude(cut_extrude4_sk8.sketch, amount=-CUT_EXTRUDE4_REACH, mode=Mode.PRIVATE) & part.part
    # Sketch6 → Cut-Extrude4 (cut, up to next)
    with BuildSketch(Plane(origin=(0, 1.46, 0), x_dir=(1, 0, 0), z_dir=(0, 1, 0)), mode=Mode.PRIVATE) as cut_extrude4_sk9:
        with Locations(Location((-7.1, 2.85, 0), (0, 0, 270))):
            Circle(SKETCH6_R)
    cut_extrude4_tool9 = extrude(cut_extrude4_sk9.sketch, amount=-CUT_EXTRUDE4_REACH, mode=Mode.PRIVATE) & part.part
    # Sketch6 → Cut-Extrude4 (cut, up to next)
    with BuildSketch(Plane(origin=(0, 1.46, 0), x_dir=(1, 0, 0), z_dir=(0, 1, 0)), mode=Mode.PRIVATE) as cut_extrude4_sk10:
        with Locations(Location((-9.1, 2.85, 0), (0, 0, 270))):
            Circle(SKETCH6_R)
    cut_extrude4_tool10 = extrude(cut_extrude4_sk10.sketch, amount=-CUT_EXTRUDE4_REACH, mode=Mode.PRIVATE) & part.part
    # Sketch6 → Cut-Extrude4 (cut, up to next)
    with BuildSketch(Plane(origin=(0, 1.46, 0), x_dir=(1, 0, 0), z_dir=(0, 1, 0)), mode=Mode.PRIVATE) as cut_extrude4_sk11:
        with Locations(Location((-11.1, 2.85, 0), (0, 0, 270))):
            Circle(SKETCH6_R)
    cut_extrude4_tool11 = extrude(cut_extrude4_sk11.sketch, amount=-CUT_EXTRUDE4_REACH, mode=Mode.PRIVATE) & part.part
    # Sketch6 → Cut-Extrude4 (cut, up to next)
    with BuildSketch(Plane(origin=(0, 1.46, 0), x_dir=(1, 0, 0), z_dir=(0, 1, 0)), mode=Mode.PRIVATE) as cut_extrude4_sk12:
        with Locations(Location((-13.1, 2.85, 0), (0, 0, 270))):
            Circle(SKETCH6_R)
    cut_extrude4_tool12 = extrude(cut_extrude4_sk12.sketch, amount=-CUT_EXTRUDE4_REACH, mode=Mode.PRIVATE) & part.part
    # Sketch6 → Cut-Extrude4 (cut, up to next)
    with BuildSketch(Plane(origin=(0, 1.46, 0), x_dir=(1, 0, 0), z_dir=(0, 1, 0)), mode=Mode.PRIVATE) as cut_extrude4_sk13:
        with Locations(Location((-15.1, 2.85, 0), (0, 0, 270))):
            Circle(SKETCH6_R)
    cut_extrude4_tool13 = extrude(cut_extrude4_sk13.sketch, amount=-CUT_EXTRUDE4_REACH, mode=Mode.PRIVATE) & part.part
    # Sketch6 → Cut-Extrude4 (cut, up to next)
    with BuildSketch(Plane(origin=(0, 1.46, 0), x_dir=(1, 0, 0), z_dir=(0, 1, 0)), mode=Mode.PRIVATE) as cut_extrude4_sk14:
        with Locations(Location((1.9, 6.95, 0), (0, 0, 270))):
            Circle(SKETCH6_R)
    cut_extrude4_tool14 = extrude(cut_extrude4_sk14.sketch, amount=-CUT_EXTRUDE4_REACH, mode=Mode.PRIVATE) & part.part
    # Sketch6 → Cut-Extrude4 (cut, up to next)
    with BuildSketch(Plane(origin=(0, 1.46, 0), x_dir=(1, 0, 0), z_dir=(0, 1, 0)), mode=Mode.PRIVATE) as cut_extrude4_sk15:
        with Locations(Location((1.9, 8.95, 0), (0, 0, 270))):
            Circle(SKETCH6_R)
    cut_extrude4_tool15 = extrude(cut_extrude4_sk15.sketch, amount=-CUT_EXTRUDE4_REACH, mode=Mode.PRIVATE) & part.part
    # Sketch6 → Cut-Extrude4 (cut, up to next)
    with BuildSketch(Plane(origin=(0, 1.46, 0), x_dir=(1, 0, 0), z_dir=(0, 1, 0)), mode=Mode.PRIVATE) as cut_extrude4_sk16:
        with Locations(Location((1.9, -1.25, 0), (0, 0, 270))):
            Circle(SKETCH6_R)
    cut_extrude4_tool16 = extrude(cut_extrude4_sk16.sketch, amount=-CUT_EXTRUDE4_REACH, mode=Mode.PRIVATE) & part.part
    # Sketch6 → Cut-Extrude4 (cut, up to next)
    with BuildSketch(Plane(origin=(0, 1.46, 0), x_dir=(1, 0, 0), z_dir=(0, 1, 0)), mode=Mode.PRIVATE) as cut_extrude4_sk17:
        with Locations(Location((1.9, -3.25, 0), (0, 0, 270))):
            Circle(SKETCH6_R)
    cut_extrude4_tool17 = extrude(cut_extrude4_sk17.sketch, amount=-CUT_EXTRUDE4_REACH, mode=Mode.PRIVATE) & part.part
    add(cut_extrude4_tool1.solids().sort_by_distance((6.4, 1.46, -2.85))[0], mode=Mode.SUBTRACT)
    add(cut_extrude4_tool2.solids().sort_by_distance((8.4, 1.46, -2.85))[0], mode=Mode.SUBTRACT)
    add(cut_extrude4_tool3.solids().sort_by_distance((10.4, 1.46, -2.85))[0], mode=Mode.SUBTRACT)
    add(cut_extrude4_tool4.solids().sort_by_distance((12.4, 1.46, -2.85))[0], mode=Mode.SUBTRACT)
    add(cut_extrude4_tool5.solids().sort_by_distance((14.4, 1.46, -2.85))[0], mode=Mode.SUBTRACT)
    add(cut_extrude4_tool6.solids().sort_by_distance((16.4, 1.46, -2.85))[0], mode=Mode.SUBTRACT)
    add(cut_extrude4_tool7.solids().sort_by_distance((-3.1, 1.46, -2.85))[0], mode=Mode.SUBTRACT)
    add(cut_extrude4_tool8.solids().sort_by_distance((-5.1, 1.46, -2.85))[0], mode=Mode.SUBTRACT)
    add(cut_extrude4_tool9.solids().sort_by_distance((-7.1, 1.46, -2.85))[0], mode=Mode.SUBTRACT)
    add(cut_extrude4_tool10.solids().sort_by_distance((-9.1, 1.46, -2.85))[0], mode=Mode.SUBTRACT)
    add(cut_extrude4_tool11.solids().sort_by_distance((-11.1, 1.46, -2.85))[0], mode=Mode.SUBTRACT)
    add(cut_extrude4_tool12.solids().sort_by_distance((-13.1, 1.46, -2.85))[0], mode=Mode.SUBTRACT)
    add(cut_extrude4_tool13.solids().sort_by_distance((-15.1, 1.46, -2.85))[0], mode=Mode.SUBTRACT)
    add(cut_extrude4_tool14.solids().sort_by_distance((1.9, 1.46, -6.95))[0], mode=Mode.SUBTRACT)
    add(cut_extrude4_tool15.solids().sort_by_distance((1.9, 1.46, -8.95))[0], mode=Mode.SUBTRACT)
    add(cut_extrude4_tool16.solids().sort_by_distance((1.9, 1.46, 1.25))[0], mode=Mode.SUBTRACT)
    add(cut_extrude4_tool17.solids().sort_by_distance((1.9, 1.46, 3.25))[0], mode=Mode.SUBTRACT)


solid = part.part
